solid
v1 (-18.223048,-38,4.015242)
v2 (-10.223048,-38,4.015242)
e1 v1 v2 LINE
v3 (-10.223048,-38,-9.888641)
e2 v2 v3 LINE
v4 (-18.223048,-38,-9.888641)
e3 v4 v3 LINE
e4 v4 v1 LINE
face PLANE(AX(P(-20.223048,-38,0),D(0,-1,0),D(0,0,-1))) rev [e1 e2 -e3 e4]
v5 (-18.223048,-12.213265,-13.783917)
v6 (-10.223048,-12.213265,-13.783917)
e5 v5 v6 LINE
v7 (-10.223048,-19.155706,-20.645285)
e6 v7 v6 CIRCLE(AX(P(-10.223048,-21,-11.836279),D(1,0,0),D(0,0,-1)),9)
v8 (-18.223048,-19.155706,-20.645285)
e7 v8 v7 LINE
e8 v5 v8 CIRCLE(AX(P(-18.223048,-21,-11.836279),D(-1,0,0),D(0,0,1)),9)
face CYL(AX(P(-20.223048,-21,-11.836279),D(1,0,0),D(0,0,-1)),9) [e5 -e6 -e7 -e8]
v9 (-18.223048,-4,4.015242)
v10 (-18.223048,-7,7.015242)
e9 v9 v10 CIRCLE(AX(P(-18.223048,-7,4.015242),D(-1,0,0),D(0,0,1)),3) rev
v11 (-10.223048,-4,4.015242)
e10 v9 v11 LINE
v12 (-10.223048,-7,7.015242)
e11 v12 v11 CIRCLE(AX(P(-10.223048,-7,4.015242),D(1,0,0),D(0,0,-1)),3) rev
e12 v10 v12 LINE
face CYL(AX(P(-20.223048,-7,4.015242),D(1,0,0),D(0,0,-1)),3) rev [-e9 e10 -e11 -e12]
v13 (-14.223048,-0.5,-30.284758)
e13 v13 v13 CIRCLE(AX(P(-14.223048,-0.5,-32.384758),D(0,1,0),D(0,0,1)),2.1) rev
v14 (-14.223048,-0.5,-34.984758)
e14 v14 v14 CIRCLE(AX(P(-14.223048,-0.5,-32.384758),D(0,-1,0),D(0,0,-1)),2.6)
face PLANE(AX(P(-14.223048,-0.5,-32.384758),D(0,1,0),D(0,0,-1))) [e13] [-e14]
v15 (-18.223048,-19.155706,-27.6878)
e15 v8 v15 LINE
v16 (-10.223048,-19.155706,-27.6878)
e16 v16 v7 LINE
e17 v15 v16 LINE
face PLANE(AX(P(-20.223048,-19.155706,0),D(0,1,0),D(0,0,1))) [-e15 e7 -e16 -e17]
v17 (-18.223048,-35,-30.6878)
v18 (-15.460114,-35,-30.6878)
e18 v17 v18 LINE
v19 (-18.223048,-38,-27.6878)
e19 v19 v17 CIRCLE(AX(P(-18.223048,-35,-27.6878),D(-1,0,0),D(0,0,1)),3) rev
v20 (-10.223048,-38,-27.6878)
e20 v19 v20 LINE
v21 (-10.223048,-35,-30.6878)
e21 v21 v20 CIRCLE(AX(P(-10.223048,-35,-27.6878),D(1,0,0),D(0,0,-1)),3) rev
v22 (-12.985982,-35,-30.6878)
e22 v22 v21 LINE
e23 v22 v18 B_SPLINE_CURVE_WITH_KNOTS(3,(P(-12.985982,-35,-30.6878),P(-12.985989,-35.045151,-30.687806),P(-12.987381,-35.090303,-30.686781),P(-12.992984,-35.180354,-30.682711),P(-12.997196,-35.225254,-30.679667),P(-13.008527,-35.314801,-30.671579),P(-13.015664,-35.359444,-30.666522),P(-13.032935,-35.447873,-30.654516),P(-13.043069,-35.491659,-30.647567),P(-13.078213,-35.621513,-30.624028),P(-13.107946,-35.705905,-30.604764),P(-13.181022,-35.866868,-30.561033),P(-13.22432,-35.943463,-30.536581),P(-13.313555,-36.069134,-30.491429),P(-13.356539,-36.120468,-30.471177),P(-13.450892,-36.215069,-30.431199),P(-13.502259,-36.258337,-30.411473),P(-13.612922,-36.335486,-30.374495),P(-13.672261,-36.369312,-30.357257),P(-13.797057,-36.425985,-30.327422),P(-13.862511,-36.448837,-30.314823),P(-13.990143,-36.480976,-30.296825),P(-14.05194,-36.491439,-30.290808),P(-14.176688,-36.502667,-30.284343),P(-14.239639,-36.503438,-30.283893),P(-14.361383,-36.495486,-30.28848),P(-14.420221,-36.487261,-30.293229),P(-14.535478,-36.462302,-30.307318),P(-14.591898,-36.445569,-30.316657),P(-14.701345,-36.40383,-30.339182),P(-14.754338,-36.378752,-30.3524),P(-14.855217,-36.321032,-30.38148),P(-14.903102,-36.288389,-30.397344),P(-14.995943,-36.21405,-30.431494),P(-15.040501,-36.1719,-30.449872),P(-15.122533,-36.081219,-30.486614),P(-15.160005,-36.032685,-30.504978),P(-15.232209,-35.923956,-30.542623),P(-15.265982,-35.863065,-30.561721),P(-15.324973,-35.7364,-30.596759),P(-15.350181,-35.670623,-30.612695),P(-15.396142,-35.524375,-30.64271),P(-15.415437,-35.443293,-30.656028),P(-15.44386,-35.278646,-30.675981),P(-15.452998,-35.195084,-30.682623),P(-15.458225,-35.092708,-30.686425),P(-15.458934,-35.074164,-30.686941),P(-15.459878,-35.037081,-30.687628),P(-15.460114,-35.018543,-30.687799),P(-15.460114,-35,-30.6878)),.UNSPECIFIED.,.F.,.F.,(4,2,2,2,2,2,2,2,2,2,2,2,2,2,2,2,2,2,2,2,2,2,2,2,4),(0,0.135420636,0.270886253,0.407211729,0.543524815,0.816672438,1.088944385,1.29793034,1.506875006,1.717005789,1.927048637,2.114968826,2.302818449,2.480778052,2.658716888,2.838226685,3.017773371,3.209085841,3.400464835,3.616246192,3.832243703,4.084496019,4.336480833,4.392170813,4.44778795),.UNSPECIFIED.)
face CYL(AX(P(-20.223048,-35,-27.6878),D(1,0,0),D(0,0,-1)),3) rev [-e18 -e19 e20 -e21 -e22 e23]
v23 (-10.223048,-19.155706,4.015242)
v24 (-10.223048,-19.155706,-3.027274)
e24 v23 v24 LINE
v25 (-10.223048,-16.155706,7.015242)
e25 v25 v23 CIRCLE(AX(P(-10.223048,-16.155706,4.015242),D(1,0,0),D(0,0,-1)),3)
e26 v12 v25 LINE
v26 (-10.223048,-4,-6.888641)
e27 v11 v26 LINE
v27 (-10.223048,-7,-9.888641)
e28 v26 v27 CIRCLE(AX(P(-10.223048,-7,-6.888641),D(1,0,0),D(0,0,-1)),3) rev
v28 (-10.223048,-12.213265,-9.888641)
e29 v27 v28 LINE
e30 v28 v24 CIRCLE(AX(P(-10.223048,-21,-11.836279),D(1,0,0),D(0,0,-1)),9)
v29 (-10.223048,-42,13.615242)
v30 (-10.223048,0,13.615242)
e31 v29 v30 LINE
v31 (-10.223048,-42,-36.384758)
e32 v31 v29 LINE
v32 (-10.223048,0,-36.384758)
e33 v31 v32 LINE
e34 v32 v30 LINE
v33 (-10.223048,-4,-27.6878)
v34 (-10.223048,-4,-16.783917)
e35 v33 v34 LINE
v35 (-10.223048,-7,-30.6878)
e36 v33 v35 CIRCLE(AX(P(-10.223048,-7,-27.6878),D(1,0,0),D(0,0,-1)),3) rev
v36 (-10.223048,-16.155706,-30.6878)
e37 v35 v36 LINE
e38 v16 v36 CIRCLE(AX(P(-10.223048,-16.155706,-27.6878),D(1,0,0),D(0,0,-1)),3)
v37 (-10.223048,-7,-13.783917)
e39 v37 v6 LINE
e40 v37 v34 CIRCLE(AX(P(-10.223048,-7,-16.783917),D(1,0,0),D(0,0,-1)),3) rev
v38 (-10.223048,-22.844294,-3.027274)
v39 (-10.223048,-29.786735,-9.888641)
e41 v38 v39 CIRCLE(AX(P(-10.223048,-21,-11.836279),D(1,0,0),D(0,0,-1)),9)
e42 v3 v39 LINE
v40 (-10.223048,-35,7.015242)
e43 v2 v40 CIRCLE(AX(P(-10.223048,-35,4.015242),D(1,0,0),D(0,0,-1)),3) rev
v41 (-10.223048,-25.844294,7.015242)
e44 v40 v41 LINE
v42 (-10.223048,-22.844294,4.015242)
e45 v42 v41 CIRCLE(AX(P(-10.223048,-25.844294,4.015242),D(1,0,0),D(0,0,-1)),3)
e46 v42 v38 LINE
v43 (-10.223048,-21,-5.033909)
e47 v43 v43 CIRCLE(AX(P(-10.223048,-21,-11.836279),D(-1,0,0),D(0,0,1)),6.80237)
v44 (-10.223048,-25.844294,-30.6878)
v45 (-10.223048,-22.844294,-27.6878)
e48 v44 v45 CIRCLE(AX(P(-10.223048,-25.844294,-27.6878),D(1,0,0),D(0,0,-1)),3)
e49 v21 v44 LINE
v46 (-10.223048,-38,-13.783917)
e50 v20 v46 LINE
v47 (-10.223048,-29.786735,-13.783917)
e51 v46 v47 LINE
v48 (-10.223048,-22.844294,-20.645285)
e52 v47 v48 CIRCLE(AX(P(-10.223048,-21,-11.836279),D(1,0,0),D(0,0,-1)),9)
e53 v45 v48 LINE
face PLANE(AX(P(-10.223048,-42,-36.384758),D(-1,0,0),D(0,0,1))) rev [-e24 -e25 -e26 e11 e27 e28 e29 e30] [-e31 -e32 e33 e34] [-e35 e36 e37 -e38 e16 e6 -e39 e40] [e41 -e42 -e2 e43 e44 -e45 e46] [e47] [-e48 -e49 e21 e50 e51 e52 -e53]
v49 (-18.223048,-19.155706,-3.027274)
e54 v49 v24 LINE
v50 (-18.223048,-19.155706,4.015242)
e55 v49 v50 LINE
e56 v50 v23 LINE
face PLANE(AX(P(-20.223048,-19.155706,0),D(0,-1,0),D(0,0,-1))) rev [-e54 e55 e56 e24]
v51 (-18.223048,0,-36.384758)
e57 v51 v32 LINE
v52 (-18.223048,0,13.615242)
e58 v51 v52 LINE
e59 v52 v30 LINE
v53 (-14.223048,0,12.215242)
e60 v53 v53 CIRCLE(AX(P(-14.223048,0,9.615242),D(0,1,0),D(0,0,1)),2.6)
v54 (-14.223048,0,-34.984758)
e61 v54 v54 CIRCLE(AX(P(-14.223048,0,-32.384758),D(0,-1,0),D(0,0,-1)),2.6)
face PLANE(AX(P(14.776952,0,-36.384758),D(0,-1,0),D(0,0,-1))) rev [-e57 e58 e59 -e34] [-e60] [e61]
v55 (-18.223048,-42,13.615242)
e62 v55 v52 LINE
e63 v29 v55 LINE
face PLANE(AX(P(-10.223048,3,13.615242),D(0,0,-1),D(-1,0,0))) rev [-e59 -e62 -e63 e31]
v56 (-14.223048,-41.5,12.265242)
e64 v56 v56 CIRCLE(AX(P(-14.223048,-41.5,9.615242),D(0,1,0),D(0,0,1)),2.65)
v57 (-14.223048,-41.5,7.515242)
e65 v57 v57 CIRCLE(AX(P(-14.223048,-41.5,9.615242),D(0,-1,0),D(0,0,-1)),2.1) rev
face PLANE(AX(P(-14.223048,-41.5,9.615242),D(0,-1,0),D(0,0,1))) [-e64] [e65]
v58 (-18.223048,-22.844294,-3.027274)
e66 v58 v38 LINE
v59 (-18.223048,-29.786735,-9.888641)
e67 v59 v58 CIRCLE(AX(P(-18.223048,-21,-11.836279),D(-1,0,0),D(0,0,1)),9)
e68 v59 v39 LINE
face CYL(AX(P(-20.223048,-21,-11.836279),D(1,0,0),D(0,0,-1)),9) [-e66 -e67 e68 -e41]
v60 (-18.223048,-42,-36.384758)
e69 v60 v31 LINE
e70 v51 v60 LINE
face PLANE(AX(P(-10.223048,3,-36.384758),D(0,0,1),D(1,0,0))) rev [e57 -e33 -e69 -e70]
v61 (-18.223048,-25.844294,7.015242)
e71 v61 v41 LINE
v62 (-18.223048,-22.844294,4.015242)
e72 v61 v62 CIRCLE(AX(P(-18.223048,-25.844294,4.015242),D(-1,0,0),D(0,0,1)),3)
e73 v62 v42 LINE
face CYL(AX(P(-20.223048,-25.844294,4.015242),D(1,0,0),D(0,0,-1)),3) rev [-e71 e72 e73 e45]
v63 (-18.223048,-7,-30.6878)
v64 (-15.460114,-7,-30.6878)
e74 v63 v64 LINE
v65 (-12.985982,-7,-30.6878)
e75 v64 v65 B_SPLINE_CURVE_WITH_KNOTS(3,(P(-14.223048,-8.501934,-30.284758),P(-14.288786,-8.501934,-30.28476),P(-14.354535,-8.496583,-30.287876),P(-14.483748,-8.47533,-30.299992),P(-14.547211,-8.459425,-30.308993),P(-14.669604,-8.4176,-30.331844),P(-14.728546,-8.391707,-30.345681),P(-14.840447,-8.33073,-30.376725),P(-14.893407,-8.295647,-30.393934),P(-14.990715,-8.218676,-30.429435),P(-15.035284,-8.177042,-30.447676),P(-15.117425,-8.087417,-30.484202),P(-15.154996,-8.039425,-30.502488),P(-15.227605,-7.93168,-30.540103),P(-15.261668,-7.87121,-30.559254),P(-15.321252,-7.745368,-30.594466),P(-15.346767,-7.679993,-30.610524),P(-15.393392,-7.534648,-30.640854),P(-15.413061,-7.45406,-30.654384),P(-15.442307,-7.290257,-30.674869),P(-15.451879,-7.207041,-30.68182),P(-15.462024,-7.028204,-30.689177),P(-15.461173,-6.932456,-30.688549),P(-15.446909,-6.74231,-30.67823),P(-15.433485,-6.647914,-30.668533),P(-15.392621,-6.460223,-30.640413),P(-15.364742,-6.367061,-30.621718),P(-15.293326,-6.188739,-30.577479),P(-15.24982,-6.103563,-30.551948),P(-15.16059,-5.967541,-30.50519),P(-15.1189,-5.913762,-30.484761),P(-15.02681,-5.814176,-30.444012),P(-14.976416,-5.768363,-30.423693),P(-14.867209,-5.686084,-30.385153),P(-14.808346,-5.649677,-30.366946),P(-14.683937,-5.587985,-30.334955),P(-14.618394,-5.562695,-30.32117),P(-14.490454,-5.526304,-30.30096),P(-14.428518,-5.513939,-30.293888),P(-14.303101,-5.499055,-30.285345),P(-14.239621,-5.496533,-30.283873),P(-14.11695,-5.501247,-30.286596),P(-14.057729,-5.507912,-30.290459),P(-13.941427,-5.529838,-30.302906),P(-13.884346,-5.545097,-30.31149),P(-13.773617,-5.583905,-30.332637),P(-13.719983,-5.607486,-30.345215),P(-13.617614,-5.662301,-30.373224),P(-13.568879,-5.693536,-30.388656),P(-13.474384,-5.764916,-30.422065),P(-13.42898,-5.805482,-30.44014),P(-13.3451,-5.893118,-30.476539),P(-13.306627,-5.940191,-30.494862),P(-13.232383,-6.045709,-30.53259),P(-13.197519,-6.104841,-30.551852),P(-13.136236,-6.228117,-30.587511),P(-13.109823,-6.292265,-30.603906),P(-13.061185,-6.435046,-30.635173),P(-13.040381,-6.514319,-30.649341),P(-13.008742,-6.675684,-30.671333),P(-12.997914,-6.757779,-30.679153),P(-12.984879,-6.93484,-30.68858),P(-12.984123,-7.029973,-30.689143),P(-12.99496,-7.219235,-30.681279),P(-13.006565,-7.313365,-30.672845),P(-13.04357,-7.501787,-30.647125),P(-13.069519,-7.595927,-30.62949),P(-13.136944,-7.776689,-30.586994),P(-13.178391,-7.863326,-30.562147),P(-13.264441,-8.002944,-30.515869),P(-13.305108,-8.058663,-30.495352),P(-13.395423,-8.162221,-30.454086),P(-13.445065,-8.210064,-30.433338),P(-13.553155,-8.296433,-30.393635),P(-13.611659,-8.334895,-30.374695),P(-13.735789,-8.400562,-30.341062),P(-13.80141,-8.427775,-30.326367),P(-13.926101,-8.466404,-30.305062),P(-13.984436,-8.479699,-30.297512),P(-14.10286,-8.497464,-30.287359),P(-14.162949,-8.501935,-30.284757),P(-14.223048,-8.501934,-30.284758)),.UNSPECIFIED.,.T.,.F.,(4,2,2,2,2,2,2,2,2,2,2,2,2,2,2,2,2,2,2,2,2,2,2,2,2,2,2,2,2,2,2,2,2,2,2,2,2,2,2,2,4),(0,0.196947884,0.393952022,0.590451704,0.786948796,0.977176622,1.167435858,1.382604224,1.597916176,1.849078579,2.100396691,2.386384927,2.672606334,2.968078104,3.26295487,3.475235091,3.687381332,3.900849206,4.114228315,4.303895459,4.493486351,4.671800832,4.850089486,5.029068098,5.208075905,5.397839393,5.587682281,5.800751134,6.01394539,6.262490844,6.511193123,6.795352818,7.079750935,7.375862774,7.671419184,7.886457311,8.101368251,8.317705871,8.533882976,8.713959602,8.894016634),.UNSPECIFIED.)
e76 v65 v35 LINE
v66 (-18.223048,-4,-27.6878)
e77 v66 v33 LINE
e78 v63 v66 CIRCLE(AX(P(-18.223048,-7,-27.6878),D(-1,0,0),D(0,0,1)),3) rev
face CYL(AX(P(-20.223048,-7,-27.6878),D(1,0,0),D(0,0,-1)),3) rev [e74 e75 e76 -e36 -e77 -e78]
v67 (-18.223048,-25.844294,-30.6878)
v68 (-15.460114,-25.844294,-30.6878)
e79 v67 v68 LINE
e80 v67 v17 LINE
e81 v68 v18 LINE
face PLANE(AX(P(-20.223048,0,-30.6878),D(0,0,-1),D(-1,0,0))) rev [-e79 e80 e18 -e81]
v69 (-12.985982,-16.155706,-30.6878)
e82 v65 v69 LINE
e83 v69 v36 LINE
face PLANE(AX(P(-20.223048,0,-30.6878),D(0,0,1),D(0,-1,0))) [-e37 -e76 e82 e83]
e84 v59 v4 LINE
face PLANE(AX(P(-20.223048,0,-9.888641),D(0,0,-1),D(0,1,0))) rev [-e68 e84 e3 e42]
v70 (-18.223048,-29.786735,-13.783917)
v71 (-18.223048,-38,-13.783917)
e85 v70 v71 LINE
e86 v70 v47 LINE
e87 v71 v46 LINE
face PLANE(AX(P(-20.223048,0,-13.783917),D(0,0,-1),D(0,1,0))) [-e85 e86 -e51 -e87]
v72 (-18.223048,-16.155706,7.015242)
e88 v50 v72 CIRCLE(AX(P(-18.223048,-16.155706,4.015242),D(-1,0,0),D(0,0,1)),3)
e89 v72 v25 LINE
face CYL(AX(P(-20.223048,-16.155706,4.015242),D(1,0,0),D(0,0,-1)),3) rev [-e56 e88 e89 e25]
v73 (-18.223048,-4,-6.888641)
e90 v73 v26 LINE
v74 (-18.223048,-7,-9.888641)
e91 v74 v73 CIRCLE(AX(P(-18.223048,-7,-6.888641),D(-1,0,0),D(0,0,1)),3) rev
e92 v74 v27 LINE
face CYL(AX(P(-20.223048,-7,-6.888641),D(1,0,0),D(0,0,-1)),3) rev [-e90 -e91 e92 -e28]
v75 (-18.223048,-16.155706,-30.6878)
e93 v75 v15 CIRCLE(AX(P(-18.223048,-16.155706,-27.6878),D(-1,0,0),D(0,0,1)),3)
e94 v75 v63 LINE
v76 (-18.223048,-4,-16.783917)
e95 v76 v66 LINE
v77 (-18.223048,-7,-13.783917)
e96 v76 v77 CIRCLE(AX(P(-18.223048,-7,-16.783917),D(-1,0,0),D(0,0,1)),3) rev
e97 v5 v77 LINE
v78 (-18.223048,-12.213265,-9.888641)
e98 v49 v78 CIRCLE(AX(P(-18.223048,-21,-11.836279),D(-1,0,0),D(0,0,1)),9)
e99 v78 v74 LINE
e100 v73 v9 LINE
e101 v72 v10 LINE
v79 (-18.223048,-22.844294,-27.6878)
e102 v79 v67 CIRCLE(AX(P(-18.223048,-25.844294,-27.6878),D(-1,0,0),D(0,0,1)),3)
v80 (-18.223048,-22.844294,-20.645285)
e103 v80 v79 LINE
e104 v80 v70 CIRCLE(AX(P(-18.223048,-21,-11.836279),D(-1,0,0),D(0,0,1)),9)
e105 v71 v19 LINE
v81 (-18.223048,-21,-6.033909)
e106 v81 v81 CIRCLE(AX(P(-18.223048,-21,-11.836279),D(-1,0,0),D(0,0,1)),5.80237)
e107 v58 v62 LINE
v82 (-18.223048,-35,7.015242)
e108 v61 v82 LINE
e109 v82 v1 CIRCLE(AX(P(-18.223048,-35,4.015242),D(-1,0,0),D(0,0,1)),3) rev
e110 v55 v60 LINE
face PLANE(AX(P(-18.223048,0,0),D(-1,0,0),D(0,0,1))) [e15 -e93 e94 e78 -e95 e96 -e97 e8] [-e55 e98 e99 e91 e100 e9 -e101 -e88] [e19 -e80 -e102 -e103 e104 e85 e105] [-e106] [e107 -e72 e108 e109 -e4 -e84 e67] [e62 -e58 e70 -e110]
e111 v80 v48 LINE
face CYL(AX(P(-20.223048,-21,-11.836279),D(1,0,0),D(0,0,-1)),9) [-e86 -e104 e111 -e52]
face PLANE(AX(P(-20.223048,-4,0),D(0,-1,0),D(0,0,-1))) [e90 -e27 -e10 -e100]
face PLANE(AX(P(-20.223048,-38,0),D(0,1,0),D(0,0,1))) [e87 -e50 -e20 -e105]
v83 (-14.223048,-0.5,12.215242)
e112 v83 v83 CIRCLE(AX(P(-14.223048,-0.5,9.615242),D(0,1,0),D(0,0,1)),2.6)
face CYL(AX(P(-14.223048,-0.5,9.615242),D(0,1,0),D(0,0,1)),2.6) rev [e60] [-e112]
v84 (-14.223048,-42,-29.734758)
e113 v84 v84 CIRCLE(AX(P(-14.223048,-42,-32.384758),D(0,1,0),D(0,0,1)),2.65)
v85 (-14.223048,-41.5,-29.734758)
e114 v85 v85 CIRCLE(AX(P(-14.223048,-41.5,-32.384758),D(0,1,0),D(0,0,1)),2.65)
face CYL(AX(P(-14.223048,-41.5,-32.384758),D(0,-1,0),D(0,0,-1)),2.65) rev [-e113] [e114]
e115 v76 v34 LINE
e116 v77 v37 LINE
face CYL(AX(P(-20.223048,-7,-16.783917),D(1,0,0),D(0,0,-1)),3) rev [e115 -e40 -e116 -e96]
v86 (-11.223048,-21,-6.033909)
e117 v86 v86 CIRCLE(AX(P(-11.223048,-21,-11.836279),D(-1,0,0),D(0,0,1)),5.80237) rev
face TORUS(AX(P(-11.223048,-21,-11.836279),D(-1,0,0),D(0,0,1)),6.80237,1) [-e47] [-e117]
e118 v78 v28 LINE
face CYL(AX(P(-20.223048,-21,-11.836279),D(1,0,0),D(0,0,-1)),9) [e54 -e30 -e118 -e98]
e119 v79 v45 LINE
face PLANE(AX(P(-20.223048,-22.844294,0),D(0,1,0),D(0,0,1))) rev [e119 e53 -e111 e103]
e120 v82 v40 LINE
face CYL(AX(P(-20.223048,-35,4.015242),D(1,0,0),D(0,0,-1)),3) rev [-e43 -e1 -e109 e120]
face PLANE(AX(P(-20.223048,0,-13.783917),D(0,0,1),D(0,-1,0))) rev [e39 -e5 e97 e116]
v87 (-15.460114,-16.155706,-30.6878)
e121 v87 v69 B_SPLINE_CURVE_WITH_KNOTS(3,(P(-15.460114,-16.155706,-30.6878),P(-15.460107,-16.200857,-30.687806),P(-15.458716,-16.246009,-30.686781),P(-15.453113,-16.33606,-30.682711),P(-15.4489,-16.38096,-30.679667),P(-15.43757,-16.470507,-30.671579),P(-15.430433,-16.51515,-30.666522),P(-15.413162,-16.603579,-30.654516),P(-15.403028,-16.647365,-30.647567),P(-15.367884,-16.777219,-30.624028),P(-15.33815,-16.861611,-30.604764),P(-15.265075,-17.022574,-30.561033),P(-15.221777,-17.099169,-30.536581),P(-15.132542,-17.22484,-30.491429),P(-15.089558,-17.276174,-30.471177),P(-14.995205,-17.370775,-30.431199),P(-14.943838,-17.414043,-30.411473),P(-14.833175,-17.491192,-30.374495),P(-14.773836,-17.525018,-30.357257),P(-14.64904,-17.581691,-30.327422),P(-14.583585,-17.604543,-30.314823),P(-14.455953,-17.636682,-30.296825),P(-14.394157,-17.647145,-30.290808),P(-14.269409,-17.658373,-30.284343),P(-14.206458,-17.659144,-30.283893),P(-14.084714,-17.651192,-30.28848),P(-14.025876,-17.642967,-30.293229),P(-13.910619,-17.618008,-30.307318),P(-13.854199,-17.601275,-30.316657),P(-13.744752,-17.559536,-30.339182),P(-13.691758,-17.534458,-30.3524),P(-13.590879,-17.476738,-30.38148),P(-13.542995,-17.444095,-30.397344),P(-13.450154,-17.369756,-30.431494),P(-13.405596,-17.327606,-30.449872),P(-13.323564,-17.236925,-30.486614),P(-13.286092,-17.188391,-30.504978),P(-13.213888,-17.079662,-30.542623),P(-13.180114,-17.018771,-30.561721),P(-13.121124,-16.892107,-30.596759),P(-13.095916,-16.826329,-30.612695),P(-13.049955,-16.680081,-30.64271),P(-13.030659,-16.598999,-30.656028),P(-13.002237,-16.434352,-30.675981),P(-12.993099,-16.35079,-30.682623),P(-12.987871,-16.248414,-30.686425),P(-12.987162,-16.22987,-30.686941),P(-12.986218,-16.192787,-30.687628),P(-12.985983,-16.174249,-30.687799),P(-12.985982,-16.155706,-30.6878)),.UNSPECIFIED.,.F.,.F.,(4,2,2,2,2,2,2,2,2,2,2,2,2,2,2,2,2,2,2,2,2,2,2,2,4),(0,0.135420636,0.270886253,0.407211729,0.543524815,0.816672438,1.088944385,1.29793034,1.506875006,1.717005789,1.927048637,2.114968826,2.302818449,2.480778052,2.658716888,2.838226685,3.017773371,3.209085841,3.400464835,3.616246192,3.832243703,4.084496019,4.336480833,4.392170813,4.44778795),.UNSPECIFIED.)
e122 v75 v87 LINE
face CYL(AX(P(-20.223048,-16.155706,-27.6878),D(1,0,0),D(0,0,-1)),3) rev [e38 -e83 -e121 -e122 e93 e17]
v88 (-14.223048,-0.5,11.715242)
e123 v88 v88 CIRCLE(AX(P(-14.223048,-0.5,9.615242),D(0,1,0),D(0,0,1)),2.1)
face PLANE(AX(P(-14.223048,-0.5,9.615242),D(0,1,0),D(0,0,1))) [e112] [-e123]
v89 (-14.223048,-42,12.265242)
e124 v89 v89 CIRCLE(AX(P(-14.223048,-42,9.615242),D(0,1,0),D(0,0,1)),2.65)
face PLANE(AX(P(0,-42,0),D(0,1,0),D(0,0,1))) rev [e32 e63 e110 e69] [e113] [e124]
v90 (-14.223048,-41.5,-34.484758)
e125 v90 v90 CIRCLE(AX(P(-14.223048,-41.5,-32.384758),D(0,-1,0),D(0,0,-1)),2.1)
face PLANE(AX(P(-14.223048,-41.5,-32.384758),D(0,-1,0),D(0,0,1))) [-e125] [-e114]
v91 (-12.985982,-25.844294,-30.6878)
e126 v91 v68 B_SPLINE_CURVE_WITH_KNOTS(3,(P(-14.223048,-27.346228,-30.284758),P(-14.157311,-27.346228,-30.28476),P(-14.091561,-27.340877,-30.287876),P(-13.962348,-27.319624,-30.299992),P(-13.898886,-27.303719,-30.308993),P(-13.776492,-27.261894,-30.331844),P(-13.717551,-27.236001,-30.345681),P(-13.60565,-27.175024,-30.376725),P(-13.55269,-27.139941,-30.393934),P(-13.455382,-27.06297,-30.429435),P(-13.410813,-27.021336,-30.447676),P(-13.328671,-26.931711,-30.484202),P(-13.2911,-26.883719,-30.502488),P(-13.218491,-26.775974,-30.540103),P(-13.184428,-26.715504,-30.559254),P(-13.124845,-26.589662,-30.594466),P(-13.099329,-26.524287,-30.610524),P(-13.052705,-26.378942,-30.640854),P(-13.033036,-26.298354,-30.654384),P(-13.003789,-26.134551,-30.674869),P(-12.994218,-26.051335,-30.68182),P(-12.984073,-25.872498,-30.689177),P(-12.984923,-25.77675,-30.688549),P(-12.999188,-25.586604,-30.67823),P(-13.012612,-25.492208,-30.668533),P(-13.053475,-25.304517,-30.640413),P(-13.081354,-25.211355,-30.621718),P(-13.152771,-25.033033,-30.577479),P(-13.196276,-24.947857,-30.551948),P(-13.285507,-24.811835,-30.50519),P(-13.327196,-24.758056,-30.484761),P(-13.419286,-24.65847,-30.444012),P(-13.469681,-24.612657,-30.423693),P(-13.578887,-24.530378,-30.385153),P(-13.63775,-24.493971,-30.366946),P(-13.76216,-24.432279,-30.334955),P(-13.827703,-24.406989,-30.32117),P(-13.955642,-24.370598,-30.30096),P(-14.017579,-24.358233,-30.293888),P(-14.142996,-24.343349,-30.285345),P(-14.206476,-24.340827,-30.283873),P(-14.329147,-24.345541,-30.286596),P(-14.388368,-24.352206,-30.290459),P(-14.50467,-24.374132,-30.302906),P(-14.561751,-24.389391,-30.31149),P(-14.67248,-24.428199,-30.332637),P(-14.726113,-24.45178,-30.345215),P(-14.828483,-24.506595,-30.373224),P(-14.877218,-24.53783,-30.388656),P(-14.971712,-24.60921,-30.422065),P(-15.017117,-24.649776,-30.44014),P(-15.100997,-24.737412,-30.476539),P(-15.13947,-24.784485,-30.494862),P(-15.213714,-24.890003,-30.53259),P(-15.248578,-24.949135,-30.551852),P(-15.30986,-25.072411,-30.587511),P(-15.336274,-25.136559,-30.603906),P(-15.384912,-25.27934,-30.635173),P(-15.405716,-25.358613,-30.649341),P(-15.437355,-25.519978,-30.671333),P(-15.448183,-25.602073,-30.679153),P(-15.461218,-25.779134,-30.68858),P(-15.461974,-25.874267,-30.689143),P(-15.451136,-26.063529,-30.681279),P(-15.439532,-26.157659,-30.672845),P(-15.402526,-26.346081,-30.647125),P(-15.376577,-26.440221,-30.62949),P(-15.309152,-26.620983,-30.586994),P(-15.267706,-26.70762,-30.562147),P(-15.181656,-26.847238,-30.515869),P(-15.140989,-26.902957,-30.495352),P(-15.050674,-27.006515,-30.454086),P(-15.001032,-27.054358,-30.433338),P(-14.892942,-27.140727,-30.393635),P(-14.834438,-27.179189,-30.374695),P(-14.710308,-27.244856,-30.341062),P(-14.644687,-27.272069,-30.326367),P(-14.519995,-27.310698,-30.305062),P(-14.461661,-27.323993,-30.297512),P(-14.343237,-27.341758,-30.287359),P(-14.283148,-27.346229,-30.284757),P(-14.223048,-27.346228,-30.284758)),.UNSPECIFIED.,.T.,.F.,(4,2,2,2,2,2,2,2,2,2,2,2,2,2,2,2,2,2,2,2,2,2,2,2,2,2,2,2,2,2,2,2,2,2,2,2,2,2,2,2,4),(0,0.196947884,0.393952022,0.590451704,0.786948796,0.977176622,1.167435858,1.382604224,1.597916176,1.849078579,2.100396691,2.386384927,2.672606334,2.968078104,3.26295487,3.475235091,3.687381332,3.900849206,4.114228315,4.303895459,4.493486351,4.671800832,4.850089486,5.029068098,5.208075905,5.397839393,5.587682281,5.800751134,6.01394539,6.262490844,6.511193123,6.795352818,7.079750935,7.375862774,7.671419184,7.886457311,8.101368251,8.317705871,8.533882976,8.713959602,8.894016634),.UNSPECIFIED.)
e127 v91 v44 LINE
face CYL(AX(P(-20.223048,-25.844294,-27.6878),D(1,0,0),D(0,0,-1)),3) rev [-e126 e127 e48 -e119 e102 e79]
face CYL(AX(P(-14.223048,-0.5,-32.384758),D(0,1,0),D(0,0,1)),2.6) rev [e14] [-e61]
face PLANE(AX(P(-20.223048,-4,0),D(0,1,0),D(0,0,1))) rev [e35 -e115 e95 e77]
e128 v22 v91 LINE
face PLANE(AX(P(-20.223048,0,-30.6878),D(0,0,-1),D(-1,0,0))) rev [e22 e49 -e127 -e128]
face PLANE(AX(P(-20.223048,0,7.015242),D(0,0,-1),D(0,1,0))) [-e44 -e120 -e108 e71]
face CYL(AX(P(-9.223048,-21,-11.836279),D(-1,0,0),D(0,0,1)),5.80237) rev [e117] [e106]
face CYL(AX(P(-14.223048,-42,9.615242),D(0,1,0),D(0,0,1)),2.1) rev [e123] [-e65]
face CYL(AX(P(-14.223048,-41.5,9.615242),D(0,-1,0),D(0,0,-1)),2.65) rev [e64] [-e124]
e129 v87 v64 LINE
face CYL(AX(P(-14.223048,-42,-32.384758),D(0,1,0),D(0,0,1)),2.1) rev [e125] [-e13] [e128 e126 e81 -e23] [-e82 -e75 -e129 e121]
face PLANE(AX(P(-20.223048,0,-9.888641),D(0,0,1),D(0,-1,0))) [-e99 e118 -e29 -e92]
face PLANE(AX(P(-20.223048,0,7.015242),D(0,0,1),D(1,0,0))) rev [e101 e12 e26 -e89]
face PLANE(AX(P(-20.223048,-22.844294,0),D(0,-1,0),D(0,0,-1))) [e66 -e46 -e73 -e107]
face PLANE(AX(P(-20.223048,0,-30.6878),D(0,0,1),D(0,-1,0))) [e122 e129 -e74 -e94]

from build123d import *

# Parameters (mm, degrees)
SKETCH1_W           = 25
SKETCH1_H           = 50
SKETCH1_R           = 3.4
BOSS_EXTRUDE1_DEPTH = 3
SKETCH2_W           = 50
SKETCH2_H           = 3
BOSS_EXTRUDE2_DEPTH = 8
SKETCH3_W           = 8
SKETCH3_H           = 50
BOSS_EXTRUDE3_DEPTH = 42
SKETCH4_R           = 2.65
CUT_EXTRUDE1_DEPTH  = 0.5
SKETCH5_R           = 5.802370205
CUT_EXTRUDE2_DEPTH  = 9
FILLET2_R           = 1
SKETCH6_R           = 12.6
BOSS_EXTRUDE4_DEPTH = 2
FILLET4_R           = 1
SKETCH8_R           = 1.589780168
SKETCH8_R_2         = 1.777428262
CUT_EXTRUDE3_DEPTH  = 10
SKETCH9_W           = 49.021678163
SKETCH9_H           = 20.976854622
CUT_EXTRUDE4_DEPTH  = 68.79439129
SKETCH11_R          = 2.1
CUT_EXTRUDE5_DEPTH  = 59.480168703
SKETCH14_R          = 2.6
CUT_EXTRUDE6_DEPTH  = 0.5
CUT_EXTRUDE7_DEPTH  = 10


with BuildPart() as part:
    # Sketch1 → Boss-Extrude1 (new body)
    with BuildSketch(Plane(origin=(0, 0, 0), x_dir=(1, 0, 0), z_dir=(0, 1, 0))):
        with Locations((2.276951673, 11.384758364)):
            Rectangle(SKETCH1_W, SKETCH1_H)
        with Locations(Location((1.276951673, 11.384758364, 0), (0, 0, 270))):
            Circle(SKETCH1_R, mode=Mode.SUBTRACT)
    extrude(amount=BOSS_EXTRUDE1_DEPTH)

    # Sketch2 → Boss-Extrude2 (add)
    with BuildSketch(Plane.ZY.offset(10.223048327)):
        with Locations((-11.384758364, 1.5)):
            Rectangle(SKETCH2_W, SKETCH2_H)
    extrude(amount=BOSS_EXTRUDE2_DEPTH)

    # Sketch3 → Boss-Extrude3 (add)
    with BuildSketch(Plane.XZ):
        with Locations((-14.223048327, -11.384758364)):
            Rectangle(SKETCH3_W, SKETCH3_H)
    extrude(amount=BOSS_EXTRUDE3_DEPTH)

    # Sketch4 → Cut-Extrude1 (cut)
    with BuildSketch(Plane(origin=(0, 3, 0), x_dir=(1, 0, 0), z_dir=(0, 1, 0))):
        with Locations(Location((-14.223048327, 32.384758364, 0), (0, 0, 270))):
            Circle(SKETCH4_R)
        with Locations(Location((-14.223048327, -9.615241636, 0), (0, 0, 270))):
            Circle(SKETCH4_R)
    cut_extrude1 = extrude(amount=-CUT_EXTRUDE1_DEPTH, mode=Mode.SUBTRACT)

    # Mirror1: Cut-Extrude1 across plane
    add(cut_extrude1.mirror(Plane.ZX.offset(-19.5)), mode=Mode.SUBTRACT)

    # Sketch5 → Cut-Extrude2 (cut)
    with BuildSketch(Plane.ZY.offset(18.223048327)):
        with Locations((-11.836279124, -21)):
            Circle(SKETCH5_R)
    extrude(amount=-CUT_EXTRUDE2_DEPTH, mode=Mode.SUBTRACT)

    # Fillet2
    fillet2_edges = [part.edges().sort_by_distance(p)[0] for p in [
        (-10.223048327, -21, -17.638649329),
    ]]
    fillet(fillet2_edges, radius=FILLET2_R)

    # Mirror2: Cut-Extrude1 across plane
    add(cut_extrude1.mirror(Plane.ZY.offset(1.723048327)), mode=Mode.SUBTRACT)

    # Sketch6 → Boss-Extrude4 (add)
    with BuildSketch(Plane(origin=(0, 3, 0), x_dir=(1, 0, 0), z_dir=(0, 1, 0))):
        with BuildLine():
            Line((14.776951673, 5.825082115), (14.776951673, 16.944434614))
            ThreePointArc((14.776951673, 16.944434614), (-13.323048327, 11.384758364), (14.776951673, 5.825082115))
        make_face()
        with Locations(Location((1.276951673, 11.384758364, 0), (0, 0, 270))):
            Circle(SKETCH6_R, mode=Mode.SUBTRACT)
    extrude(amount=BOSS_EXTRUDE4_DEPTH)

    # Fillet4
    # the kernel refuses this fillet: 1 mm, written as the material it takes off along each edge
    with BuildSketch(Plane(origin=(14.776951673, 5, -3.325082115), x_dir=(0, -1, 0), z_dir=(0, 0, -1))) as fillet4_piece_1:
        with BuildLine():
            CenterArc((FILLET4_R, FILLET4_R), FILLET4_R, 180, 90)
            Line((0, FILLET4_R), (0, 0))
            Line((0, 0), (FILLET4_R, 0))
        make_face()
    extrude(amount=16.119352499, mode=Mode.SUBTRACT)

    # Sketch8 → Cut-Extrude3 (cut)
    with BuildSketch(Plane(origin=(0, 3, 0), x_dir=(1, 0, 0), z_dir=(0, 1, 0))):
        with Locations(Location((1.276951673, 19.884758364, 0), (0, 0, 270))):
            Circle(SKETCH8_R)
        with Locations(Location((1.276951673, 2.884758364, 0), (0, 0, 270))):
            Circle(SKETCH8_R_2)
    extrude(amount=-CUT_EXTRUDE3_DEPTH, mode=Mode.SUBTRACT)

    # Sketch9 → Cut-Extrude4 (cut, through all)
    with BuildSketch(Plane.XY.offset(13.615241636)):
        with Locations((-9.733887409, 10.488427311)):
            Rectangle(SKETCH9_W, SKETCH9_H)
    extrude(amount=-CUT_EXTRUDE4_DEPTH, mode=Mode.SUBTRACT)

    # Sketch11 → Cut-Extrude5 (cut, through all)
    with BuildSketch(Plane(origin=(0, 0, 0), x_dir=(1, 0, 0), z_dir=(0, 1, 0))):
        with Locations(Location((-14.223048327, 32.384758364, 0), (0, 0, 270))):
            Circle(SKETCH11_R)
    cut_extrude5 = extrude(amount=-CUT_EXTRUDE5_DEPTH, mode=Mode.SUBTRACT)

    # Mirror3: Cut-Extrude5 across plane
    add(cut_extrude5.mirror(Plane.XY.offset(-11.384758364)), mode=Mode.SUBTRACT)

    # Sketch14 → Cut-Extrude6 (cut)
    with BuildSketch(Plane(origin=(0, 0, 0), x_dir=(1, 0, 0), z_dir=(0, 1, 0))):
        with Locations(Location((-14.223048327, -9.615241636, 0), (0, 0, 270))):
            Circle(SKETCH14_R)
    cut_extrude6 = extrude(amount=-CUT_EXTRUDE6_DEPTH, mode=Mode.SUBTRACT)

    # Mirror4: Cut-Extrude6 across plane
    add(cut_extrude6.mirror(Plane.XY.offset(-11.384758364)), mode=Mode.SUBTRACT)

    # Sketch15 → Cut-Extrude7 (cut)
    with BuildSketch(Plane(origin=(-10.223048327, 0, 0), x_dir=(0, 0, -1), z_dir=(1, 0, 0))):
        with BuildLine():
            ThreePointArc((-4.015241636, -4), (-6.136561979, -4.878679656), (-7.015241636, -7))
            Line((-7.015241636, -7), (-7.015241636, -16.15570602))
            ThreePointArc((-7.015241636, -16.15570602), (-6.136561979, -18.277026364), (-4.015241636, -19.15570602))
            Line((-4.015241636, -19.15570602), (3.027273521, -19.15570602))
            ThreePointArc((3.027273521, -19.15570602), (5.435051506, -14.673525074), (9.888641359, -12.213265275))
            Line((9.888641359, -12.213265275), (9.888641359, -7))
            ThreePointArc((9.888641359, -7), (9.009961702, -4.878679656), (6.888641359, -4))
            Line((6.888641359, -4), (-4.015241636, -4))
        make_face()
        with BuildLine():
            Line((13.783916889, -7), (13.783916889, -12.213265275))
            ThreePointArc((13.783916889, -12.213265275), (18.237506742, -14.673525074), (20.645284727, -19.15570602))
            Line((20.645284727, -19.15570602), (27.687799884, -19.15570602))
            ThreePointArc((27.687799884, -19.15570602), (29.809120227, -18.277026364), (30.687799884, -16.15570602))
            Line((30.687799884, -16.15570602), (30.687799884, -7))
            ThreePointArc((30.687799884, -7), (29.809120227, -4.878679656), (27.687799884, -4))
            Line((27.687799884, -4), (16.783916889, -4))
            ThreePointArc((16.783916889, -4), (14.662596546, -4.878679656), (13.783916889, -7))
        make_face()
        with BuildLine():
            ThreePointArc((20.645284727, -22.84429398), (18.237506742, -27.326474926), (13.783916889, -29.786734725))
            Line((13.783916889, -29.786734725), (13.783916889, -38))
            Line((13.783916889, -38), (27.687799884, -38))
            ThreePointArc((27.687799884, -38), (29.809120227, -37.121320344), (30.687799884, -35))
            Line((30.687799884, -35), (30.687799884, -25.84429398))
            ThreePointArc((30.687799884, -25.84429398), (29.809120227, -23.722973636), (27.687799884, -22.84429398))
            Line((27.687799884, -22.84429398), (20.645284727, -22.84429398))
        make_face()
        with BuildLine():
            ThreePointArc((9.888641359, -29.786734725), (5.435051506, -27.326474926), (3.027273521, -22.84429398))
            Line((3.027273521, -22.84429398), (-4.015241636, -22.84429398))
            ThreePointArc((-4.015241636, -22.84429398), (-6.136561979, -23.722973636), (-7.015241636, -25.84429398))
            Line((-7.015241636, -25.84429398), (-7.015241636, -35))
            ThreePointArc((-7.015241636, -35), (-6.136561979, -37.121320344), (-4.015241636, -38))
            Line((-4.015241636, -38), (9.888641359, -38))
            Line((9.888641359, -38), (9.888641359, -29.786734725))
        make_face()
    extrude(amount=-CUT_EXTRUDE7_DEPTH, mode=Mode.SUBTRACT)


solid = part.part
